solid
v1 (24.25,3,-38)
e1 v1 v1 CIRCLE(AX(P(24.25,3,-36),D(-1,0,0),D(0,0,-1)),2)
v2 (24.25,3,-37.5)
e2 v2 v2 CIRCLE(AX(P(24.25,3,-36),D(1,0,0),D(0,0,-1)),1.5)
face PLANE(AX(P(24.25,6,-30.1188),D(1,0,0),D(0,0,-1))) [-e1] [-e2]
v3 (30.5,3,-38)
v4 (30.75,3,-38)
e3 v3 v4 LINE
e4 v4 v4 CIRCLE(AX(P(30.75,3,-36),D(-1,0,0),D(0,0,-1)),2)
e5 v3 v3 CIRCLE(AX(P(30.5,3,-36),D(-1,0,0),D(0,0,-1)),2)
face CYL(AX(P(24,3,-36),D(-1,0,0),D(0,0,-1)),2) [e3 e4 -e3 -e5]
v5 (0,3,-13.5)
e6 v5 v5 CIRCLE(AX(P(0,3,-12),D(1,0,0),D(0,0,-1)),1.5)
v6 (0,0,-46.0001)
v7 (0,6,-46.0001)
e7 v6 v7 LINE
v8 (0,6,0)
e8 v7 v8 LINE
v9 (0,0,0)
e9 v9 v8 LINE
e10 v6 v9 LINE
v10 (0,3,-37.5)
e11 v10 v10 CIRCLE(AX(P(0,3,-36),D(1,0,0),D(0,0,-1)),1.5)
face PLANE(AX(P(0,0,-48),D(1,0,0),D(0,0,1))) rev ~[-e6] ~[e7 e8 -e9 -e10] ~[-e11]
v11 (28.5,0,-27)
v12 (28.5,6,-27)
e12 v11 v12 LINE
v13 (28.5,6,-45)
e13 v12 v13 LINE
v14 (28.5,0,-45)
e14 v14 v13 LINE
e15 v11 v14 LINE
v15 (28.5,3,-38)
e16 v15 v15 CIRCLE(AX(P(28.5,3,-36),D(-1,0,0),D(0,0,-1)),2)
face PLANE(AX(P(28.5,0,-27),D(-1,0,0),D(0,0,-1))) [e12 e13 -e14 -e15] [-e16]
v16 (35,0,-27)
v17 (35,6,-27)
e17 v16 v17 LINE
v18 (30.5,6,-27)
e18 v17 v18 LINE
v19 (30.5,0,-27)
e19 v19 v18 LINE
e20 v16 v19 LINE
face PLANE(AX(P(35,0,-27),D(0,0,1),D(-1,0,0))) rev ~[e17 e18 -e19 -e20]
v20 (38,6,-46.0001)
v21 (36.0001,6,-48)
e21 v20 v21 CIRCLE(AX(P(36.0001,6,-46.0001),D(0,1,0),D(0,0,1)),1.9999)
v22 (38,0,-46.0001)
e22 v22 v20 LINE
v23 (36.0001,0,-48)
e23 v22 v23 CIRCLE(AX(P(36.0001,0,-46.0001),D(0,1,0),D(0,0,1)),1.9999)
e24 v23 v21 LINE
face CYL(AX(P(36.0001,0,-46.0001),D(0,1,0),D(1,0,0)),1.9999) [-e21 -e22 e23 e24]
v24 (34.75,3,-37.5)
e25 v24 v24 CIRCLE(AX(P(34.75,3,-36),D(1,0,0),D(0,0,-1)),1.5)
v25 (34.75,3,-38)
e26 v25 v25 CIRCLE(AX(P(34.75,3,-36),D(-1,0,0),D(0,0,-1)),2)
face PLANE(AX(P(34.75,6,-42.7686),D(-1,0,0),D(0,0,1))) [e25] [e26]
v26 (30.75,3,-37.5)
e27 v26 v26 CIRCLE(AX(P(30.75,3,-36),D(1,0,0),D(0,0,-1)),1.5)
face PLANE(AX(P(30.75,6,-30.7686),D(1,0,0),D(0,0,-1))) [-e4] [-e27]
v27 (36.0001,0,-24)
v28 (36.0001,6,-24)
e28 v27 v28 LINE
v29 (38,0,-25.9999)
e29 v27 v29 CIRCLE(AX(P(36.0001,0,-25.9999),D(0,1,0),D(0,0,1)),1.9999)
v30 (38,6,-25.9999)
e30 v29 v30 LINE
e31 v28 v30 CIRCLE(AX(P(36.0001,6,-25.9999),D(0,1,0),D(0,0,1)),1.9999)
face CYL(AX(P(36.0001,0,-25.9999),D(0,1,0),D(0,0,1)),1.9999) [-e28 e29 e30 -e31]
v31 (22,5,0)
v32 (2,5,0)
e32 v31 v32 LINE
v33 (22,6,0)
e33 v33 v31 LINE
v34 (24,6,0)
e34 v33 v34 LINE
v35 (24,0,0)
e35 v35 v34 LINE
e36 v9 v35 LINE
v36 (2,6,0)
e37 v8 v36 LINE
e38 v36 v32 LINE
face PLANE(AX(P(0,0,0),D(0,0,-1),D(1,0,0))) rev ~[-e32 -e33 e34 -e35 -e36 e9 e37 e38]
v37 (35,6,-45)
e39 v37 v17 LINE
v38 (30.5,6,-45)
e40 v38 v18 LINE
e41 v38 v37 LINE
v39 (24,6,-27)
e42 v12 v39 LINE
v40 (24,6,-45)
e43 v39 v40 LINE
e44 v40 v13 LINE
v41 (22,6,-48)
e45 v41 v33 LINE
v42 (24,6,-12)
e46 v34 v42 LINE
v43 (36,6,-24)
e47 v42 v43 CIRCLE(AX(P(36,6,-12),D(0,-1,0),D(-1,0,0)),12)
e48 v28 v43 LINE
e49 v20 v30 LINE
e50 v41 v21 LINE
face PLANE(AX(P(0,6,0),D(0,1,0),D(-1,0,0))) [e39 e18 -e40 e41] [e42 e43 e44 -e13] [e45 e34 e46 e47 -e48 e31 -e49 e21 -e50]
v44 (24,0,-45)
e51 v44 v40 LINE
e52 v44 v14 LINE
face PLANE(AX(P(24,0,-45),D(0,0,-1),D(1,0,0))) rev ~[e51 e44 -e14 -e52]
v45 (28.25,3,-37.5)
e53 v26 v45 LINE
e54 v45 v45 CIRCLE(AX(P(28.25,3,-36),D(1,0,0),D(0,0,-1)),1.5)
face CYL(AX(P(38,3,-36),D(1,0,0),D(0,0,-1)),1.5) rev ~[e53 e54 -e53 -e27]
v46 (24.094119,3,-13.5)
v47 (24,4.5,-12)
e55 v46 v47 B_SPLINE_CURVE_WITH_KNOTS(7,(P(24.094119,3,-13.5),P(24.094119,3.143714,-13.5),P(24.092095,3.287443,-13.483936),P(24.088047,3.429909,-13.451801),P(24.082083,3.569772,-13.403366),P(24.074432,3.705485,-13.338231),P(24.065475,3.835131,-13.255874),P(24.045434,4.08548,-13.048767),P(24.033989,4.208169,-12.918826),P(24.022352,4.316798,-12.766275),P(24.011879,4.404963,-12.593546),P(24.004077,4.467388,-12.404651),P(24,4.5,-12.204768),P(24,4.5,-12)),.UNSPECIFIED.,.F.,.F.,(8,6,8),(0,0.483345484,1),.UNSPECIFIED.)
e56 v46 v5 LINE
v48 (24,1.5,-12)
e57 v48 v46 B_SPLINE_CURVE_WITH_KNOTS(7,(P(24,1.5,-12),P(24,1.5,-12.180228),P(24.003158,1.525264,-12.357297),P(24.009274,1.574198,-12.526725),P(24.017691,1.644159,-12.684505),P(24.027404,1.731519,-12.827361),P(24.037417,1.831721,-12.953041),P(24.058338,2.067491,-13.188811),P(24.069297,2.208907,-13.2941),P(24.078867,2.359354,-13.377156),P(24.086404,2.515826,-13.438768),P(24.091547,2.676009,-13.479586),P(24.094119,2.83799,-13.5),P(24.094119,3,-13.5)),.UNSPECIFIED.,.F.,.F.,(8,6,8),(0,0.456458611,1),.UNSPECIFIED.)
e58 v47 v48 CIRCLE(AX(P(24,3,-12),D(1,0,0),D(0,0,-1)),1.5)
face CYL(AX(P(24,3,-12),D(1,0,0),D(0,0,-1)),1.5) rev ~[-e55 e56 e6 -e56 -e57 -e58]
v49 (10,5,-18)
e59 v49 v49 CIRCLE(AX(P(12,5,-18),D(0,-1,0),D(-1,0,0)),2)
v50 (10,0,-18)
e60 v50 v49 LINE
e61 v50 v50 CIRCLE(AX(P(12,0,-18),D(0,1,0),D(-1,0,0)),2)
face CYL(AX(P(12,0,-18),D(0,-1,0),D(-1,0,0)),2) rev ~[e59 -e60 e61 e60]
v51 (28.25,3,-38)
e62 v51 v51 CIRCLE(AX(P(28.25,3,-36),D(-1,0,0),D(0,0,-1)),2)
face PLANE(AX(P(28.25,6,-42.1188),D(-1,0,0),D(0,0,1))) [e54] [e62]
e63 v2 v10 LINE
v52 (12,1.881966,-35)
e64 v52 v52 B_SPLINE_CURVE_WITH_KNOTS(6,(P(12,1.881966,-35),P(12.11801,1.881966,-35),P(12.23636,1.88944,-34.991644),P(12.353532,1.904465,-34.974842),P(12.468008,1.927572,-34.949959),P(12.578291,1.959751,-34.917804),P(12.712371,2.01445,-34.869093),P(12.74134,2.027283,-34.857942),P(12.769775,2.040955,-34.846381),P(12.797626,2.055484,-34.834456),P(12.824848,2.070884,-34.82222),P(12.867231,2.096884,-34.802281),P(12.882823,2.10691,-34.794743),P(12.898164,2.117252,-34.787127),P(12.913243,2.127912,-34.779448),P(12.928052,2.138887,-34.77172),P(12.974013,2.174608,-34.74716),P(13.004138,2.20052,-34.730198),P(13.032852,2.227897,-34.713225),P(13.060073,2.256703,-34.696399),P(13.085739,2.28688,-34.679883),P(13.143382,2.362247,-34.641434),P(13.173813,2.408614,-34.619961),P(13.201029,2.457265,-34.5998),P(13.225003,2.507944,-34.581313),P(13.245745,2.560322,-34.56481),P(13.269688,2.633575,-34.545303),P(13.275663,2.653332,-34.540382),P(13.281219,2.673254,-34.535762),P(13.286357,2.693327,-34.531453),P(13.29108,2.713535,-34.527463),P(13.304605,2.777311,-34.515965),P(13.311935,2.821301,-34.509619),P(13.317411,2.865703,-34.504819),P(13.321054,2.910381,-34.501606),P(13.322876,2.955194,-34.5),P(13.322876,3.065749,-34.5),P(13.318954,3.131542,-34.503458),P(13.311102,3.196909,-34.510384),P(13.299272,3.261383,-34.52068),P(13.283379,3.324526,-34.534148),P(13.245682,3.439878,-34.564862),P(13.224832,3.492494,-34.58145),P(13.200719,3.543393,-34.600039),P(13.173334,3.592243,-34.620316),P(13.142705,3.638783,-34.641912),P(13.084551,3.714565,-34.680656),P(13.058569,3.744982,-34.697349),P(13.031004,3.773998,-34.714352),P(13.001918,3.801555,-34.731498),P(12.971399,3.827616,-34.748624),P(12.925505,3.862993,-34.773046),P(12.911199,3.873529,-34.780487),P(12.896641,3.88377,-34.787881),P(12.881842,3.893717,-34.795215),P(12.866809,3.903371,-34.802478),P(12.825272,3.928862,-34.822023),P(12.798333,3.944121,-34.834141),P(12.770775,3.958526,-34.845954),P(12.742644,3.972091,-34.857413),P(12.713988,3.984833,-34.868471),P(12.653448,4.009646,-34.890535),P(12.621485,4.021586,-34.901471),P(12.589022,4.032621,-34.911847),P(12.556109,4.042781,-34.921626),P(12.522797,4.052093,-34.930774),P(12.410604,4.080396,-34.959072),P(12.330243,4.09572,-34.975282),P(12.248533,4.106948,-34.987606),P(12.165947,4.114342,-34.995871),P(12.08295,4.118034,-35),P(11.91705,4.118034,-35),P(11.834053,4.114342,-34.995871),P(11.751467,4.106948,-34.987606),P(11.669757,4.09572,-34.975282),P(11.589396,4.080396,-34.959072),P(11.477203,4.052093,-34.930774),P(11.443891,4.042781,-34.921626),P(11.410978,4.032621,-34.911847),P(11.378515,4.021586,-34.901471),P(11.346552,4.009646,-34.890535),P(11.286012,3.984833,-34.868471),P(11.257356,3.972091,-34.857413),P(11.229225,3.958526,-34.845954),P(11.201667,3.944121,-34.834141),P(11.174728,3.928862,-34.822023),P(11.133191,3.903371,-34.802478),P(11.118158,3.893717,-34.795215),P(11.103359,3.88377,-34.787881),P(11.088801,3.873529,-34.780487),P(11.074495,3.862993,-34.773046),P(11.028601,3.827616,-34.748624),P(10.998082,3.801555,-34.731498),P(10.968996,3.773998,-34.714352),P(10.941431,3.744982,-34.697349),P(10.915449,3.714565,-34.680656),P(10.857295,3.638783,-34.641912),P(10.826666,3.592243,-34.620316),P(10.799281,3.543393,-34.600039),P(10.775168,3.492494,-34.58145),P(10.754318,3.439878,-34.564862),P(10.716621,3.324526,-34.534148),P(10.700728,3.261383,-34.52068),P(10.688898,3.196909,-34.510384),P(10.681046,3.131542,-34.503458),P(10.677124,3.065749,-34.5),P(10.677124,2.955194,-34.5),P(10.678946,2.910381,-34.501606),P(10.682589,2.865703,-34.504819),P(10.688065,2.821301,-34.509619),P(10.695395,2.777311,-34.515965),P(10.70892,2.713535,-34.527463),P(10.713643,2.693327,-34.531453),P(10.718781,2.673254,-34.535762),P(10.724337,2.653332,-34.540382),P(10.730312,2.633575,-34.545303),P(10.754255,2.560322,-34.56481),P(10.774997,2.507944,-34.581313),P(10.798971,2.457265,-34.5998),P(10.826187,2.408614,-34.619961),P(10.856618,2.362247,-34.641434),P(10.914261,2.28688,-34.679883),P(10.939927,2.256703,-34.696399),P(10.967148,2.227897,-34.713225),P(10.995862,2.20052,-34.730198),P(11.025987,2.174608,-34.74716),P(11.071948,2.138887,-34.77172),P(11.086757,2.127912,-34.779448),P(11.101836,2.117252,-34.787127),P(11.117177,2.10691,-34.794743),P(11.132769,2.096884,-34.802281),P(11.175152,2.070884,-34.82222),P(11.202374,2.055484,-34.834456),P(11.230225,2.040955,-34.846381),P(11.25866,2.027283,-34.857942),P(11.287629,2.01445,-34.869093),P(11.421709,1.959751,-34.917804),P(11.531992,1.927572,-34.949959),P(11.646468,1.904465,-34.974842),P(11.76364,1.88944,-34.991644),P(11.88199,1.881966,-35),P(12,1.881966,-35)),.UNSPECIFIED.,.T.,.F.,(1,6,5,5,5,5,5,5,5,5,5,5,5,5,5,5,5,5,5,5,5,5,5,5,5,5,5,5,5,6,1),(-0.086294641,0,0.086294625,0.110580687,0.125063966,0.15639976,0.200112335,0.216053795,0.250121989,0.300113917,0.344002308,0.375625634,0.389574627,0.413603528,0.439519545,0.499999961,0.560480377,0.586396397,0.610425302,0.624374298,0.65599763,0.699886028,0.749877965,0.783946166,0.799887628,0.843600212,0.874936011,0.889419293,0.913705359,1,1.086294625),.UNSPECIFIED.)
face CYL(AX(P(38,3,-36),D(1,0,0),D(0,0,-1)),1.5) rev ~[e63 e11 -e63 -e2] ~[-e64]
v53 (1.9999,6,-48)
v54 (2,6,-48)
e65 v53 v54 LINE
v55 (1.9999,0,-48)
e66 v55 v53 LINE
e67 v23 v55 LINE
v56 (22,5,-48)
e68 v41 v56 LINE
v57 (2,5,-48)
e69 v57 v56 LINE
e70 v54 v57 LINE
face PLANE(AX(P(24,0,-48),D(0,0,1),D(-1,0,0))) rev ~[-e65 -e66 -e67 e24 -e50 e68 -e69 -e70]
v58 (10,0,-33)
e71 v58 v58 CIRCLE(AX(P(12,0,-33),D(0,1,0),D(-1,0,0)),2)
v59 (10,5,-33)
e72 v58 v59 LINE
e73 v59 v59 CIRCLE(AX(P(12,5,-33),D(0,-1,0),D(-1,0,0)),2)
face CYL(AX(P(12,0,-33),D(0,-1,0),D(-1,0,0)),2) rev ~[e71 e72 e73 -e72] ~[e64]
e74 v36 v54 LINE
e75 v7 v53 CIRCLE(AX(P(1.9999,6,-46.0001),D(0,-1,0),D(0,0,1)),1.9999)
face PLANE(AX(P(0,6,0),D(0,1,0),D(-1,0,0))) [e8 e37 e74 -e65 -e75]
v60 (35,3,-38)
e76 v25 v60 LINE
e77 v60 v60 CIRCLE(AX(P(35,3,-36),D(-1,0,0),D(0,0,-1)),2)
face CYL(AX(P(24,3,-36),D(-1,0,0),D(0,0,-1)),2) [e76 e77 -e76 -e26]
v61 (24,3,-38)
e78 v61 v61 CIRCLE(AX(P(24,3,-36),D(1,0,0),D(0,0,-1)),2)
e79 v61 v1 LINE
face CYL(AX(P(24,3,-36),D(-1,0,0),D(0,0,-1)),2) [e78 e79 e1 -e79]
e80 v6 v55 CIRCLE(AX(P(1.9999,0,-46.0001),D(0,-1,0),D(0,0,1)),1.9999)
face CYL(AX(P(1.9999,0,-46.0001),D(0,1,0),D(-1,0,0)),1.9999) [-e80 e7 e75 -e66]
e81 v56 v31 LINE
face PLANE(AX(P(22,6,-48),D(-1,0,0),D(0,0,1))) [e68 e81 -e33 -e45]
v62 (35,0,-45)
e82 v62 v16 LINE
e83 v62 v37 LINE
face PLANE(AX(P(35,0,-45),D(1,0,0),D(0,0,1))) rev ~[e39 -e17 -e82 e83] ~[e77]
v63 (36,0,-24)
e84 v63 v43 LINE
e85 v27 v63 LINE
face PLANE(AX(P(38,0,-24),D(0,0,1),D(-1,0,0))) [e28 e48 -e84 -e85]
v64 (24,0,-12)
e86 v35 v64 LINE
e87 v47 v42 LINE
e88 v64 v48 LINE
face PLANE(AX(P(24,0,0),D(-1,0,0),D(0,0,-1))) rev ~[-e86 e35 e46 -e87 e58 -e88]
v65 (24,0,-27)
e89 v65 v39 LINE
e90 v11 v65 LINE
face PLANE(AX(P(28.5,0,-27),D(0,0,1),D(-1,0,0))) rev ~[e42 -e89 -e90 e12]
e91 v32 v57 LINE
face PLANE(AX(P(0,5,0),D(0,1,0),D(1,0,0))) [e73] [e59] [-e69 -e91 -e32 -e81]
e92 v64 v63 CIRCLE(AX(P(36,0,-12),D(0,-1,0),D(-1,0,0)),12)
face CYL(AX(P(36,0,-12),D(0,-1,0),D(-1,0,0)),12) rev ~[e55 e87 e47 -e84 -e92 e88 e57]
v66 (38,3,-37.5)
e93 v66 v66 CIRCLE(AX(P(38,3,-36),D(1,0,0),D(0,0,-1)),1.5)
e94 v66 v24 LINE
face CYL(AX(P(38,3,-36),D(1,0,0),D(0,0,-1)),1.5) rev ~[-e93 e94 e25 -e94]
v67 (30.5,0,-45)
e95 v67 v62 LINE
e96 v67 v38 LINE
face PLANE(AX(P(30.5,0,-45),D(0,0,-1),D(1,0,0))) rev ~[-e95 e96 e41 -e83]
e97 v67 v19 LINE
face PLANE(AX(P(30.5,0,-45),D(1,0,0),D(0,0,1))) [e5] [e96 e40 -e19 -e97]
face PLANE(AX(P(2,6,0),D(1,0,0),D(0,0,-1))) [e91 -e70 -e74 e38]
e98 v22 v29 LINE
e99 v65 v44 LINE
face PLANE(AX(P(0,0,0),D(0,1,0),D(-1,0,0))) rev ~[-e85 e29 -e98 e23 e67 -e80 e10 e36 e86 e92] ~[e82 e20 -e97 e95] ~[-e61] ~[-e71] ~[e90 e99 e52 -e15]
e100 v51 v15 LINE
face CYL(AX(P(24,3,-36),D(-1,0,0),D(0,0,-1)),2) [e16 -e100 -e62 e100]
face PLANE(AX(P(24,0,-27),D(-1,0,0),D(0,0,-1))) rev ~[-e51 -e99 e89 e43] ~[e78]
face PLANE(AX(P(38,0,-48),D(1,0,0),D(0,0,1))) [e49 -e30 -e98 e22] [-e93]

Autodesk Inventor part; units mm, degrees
ref_plane "YZ Plane" through (0, 0, 0) normal (1, 0, 0) x (0, 1, 0)
ref_plane "XZ Plane" through (0, 0, 0) normal (0, 1, 0) x (-1, 0, 0)
ref_plane "XY Plane" through (0, 0, 0) normal (0, 0, 1) x (1, 0, 0)
sketch "Sketch1" plane through (0, 0, 0) normal (0, 1, 0) x (-1, 0, 0)
  line L0 (0, 0) -> (-24, 0)
  line L1 (-24, -48) -> (0, -48)
  line L2 (0, -48) -> (0, 0)
  circle A0 centre (-12, -33) radius 2
  circle A1 centre (-12, -18) radius 2
  line L3 (-24, -48) -> (-38, -48)
  line L4 (-38, -48) -> (-38, -24)
  line L5 (-38, -24) -> (-24, -24)
  line L6 (-24, -27) -> (-24, -45)
  line L7 (-24, -45) -> (-35, -45)
  line L8 (-35, -45) -> (-35, -27)
  line L9 (-35, -27) -> (-24, -27)
  line L10 (-24, -27) -> (-24, -45)
  line L11 (-24, 0) -> (-24, -24)
  line L12 (-24, -27) -> (-24, -45)
  line L13 (-28.5, -45) -> (-30.5, -45)
  line L14 (-30.5, -45) -> (-30.5, -27)
  line L15 (-30.5, -27) -> (-28.5, -27)
  line L16 (-28.5, -27) -> (-28.5, -45)
  point P0 (-12, -48)
  dimension "d0" = 24
  dimension "d1" = 48
  dimension "d2" = 4
  dimension "d3" = 4
  dimension "d4" = 15
  dimension "d5" = 30
  dimension "d6" = 14
  dimension "d7" = 24
  dimension "d8" = 3
  dimension "d9" = 3
  dimension "d10" = 3
  dimension "d11" = 48
  dimension "d12" = 11
  dimension "d27" = 18
  dimension "d28" = 4.5
  dimension "d29" = 4.5
extrude "Extrusion1" add sketch "Sketch1" along normal blind 6 contours L2 L1 L3 L4 L5 L11 L0 | L16 L7 L14 L9
sketch "Sketch2" plane through (0, 6, 0) normal (0, 1, 0) x (1, 0, 0)
  line L0 (2, 48) -> (22, 48)
  line L1 (22, 48) -> (22, 0)
  line L2 (22, 0) -> (2, 0)
  line L3 (2, 0) -> (2, 48)
  line L4 (0, 0) -> (24, 0) projected
  point P0 (12, 0)
  point P1 (12, 0)
  dimension "d15" = 20
  dimension "d16" = 48
extrude "Extrusion2" cut sketch "Sketch2" against normal blind 1
sketch "Sketch3" plane through (38, 0, -24) normal (1, 0, 0) x (0, 0, -1)
  circle A0 centre (12, 3) radius 1.5
  line L0 (24, 0) -> (24, 6) projected
  line L1 (0, 6) -> (24, 6) projected
  point P0 (-24, 0)
  point P1 (24, 3)
  point P2 (12, 6)
  dimension "d19" = 3
extrude "Extrusion3" cut sketch "Sketch3" against normal through all
sketch "Sketch4" plane through (24, 0, 0) normal (1, 0, 0) x (0, 0, -1)
  circle A0 centre (12, 3) radius 1.5
  line L0 (0, 0) -> (0, 6) projected
  point P0 (0, 3)
  dimension "d22" = 3
  dimension "d23" = 12
extrude "Extrusion4" cut sketch "Sketch4" against normal through all
sketch "Sketch5" plane through (24, 0, -27) normal (1, 0, 0) x (0, 0, -1)
  circle A0 centre (9, 3) radius 1.5
  circle A1 centre (9, 3) radius 1.5 projected
  circle A2 centre (9, 3) radius 2
  point P0 (-27, 0)
  dimension "d30" = 3
  dimension "d31" = 4
extrude "Extrusion5" add sketch "Sketch5" along normal blind 12
sketch "Sketch6" plane through (0, 6, 0) normal (0, 1, 0) x (1, 0, 0)
  line L0 (30.75, 42.7686) -> (34.75, 42.7686)
  line L1 (34.75, 42.7686) -> (34.75, 30.7686)
  line L2 (34.75, 30.7686) -> (30.75, 30.7686)
  line L3 (30.75, 30.7686) -> (30.75, 42.7686)
  line L4 (30.5, 27) -> (30.5, 45) projected
  line L5 (24.25, 42.1188) -> (28.25, 42.1188)
  line L6 (28.25, 42.1188) -> (28.25, 30.1188)
  line L7 (28.25, 30.1188) -> (24.25, 30.1188)
  line L8 (24.25, 30.1188) -> (24.25, 42.1188)
  line L9 (24, 27) -> (24, 45) projected
  point P0 (0, 0)
  dimension "d34" = 4
  dimension "d35" = 12
  dimension "d36" = 0.25
  dimension "d37" = 4
  dimension "d38" = 12
  dimension "d39" = 0.25
extrude "Extrusion6" cut sketch "Sketch6" against normal through all
fillet "Fillet1" radius 12 1 edges at (24, 3, -24)
fillet "Fillet2" radius 2 3 edges at (38, 3, -24) (38, 3, -48) (0, 3, -48)
properties part number "rightshortNEW1"
